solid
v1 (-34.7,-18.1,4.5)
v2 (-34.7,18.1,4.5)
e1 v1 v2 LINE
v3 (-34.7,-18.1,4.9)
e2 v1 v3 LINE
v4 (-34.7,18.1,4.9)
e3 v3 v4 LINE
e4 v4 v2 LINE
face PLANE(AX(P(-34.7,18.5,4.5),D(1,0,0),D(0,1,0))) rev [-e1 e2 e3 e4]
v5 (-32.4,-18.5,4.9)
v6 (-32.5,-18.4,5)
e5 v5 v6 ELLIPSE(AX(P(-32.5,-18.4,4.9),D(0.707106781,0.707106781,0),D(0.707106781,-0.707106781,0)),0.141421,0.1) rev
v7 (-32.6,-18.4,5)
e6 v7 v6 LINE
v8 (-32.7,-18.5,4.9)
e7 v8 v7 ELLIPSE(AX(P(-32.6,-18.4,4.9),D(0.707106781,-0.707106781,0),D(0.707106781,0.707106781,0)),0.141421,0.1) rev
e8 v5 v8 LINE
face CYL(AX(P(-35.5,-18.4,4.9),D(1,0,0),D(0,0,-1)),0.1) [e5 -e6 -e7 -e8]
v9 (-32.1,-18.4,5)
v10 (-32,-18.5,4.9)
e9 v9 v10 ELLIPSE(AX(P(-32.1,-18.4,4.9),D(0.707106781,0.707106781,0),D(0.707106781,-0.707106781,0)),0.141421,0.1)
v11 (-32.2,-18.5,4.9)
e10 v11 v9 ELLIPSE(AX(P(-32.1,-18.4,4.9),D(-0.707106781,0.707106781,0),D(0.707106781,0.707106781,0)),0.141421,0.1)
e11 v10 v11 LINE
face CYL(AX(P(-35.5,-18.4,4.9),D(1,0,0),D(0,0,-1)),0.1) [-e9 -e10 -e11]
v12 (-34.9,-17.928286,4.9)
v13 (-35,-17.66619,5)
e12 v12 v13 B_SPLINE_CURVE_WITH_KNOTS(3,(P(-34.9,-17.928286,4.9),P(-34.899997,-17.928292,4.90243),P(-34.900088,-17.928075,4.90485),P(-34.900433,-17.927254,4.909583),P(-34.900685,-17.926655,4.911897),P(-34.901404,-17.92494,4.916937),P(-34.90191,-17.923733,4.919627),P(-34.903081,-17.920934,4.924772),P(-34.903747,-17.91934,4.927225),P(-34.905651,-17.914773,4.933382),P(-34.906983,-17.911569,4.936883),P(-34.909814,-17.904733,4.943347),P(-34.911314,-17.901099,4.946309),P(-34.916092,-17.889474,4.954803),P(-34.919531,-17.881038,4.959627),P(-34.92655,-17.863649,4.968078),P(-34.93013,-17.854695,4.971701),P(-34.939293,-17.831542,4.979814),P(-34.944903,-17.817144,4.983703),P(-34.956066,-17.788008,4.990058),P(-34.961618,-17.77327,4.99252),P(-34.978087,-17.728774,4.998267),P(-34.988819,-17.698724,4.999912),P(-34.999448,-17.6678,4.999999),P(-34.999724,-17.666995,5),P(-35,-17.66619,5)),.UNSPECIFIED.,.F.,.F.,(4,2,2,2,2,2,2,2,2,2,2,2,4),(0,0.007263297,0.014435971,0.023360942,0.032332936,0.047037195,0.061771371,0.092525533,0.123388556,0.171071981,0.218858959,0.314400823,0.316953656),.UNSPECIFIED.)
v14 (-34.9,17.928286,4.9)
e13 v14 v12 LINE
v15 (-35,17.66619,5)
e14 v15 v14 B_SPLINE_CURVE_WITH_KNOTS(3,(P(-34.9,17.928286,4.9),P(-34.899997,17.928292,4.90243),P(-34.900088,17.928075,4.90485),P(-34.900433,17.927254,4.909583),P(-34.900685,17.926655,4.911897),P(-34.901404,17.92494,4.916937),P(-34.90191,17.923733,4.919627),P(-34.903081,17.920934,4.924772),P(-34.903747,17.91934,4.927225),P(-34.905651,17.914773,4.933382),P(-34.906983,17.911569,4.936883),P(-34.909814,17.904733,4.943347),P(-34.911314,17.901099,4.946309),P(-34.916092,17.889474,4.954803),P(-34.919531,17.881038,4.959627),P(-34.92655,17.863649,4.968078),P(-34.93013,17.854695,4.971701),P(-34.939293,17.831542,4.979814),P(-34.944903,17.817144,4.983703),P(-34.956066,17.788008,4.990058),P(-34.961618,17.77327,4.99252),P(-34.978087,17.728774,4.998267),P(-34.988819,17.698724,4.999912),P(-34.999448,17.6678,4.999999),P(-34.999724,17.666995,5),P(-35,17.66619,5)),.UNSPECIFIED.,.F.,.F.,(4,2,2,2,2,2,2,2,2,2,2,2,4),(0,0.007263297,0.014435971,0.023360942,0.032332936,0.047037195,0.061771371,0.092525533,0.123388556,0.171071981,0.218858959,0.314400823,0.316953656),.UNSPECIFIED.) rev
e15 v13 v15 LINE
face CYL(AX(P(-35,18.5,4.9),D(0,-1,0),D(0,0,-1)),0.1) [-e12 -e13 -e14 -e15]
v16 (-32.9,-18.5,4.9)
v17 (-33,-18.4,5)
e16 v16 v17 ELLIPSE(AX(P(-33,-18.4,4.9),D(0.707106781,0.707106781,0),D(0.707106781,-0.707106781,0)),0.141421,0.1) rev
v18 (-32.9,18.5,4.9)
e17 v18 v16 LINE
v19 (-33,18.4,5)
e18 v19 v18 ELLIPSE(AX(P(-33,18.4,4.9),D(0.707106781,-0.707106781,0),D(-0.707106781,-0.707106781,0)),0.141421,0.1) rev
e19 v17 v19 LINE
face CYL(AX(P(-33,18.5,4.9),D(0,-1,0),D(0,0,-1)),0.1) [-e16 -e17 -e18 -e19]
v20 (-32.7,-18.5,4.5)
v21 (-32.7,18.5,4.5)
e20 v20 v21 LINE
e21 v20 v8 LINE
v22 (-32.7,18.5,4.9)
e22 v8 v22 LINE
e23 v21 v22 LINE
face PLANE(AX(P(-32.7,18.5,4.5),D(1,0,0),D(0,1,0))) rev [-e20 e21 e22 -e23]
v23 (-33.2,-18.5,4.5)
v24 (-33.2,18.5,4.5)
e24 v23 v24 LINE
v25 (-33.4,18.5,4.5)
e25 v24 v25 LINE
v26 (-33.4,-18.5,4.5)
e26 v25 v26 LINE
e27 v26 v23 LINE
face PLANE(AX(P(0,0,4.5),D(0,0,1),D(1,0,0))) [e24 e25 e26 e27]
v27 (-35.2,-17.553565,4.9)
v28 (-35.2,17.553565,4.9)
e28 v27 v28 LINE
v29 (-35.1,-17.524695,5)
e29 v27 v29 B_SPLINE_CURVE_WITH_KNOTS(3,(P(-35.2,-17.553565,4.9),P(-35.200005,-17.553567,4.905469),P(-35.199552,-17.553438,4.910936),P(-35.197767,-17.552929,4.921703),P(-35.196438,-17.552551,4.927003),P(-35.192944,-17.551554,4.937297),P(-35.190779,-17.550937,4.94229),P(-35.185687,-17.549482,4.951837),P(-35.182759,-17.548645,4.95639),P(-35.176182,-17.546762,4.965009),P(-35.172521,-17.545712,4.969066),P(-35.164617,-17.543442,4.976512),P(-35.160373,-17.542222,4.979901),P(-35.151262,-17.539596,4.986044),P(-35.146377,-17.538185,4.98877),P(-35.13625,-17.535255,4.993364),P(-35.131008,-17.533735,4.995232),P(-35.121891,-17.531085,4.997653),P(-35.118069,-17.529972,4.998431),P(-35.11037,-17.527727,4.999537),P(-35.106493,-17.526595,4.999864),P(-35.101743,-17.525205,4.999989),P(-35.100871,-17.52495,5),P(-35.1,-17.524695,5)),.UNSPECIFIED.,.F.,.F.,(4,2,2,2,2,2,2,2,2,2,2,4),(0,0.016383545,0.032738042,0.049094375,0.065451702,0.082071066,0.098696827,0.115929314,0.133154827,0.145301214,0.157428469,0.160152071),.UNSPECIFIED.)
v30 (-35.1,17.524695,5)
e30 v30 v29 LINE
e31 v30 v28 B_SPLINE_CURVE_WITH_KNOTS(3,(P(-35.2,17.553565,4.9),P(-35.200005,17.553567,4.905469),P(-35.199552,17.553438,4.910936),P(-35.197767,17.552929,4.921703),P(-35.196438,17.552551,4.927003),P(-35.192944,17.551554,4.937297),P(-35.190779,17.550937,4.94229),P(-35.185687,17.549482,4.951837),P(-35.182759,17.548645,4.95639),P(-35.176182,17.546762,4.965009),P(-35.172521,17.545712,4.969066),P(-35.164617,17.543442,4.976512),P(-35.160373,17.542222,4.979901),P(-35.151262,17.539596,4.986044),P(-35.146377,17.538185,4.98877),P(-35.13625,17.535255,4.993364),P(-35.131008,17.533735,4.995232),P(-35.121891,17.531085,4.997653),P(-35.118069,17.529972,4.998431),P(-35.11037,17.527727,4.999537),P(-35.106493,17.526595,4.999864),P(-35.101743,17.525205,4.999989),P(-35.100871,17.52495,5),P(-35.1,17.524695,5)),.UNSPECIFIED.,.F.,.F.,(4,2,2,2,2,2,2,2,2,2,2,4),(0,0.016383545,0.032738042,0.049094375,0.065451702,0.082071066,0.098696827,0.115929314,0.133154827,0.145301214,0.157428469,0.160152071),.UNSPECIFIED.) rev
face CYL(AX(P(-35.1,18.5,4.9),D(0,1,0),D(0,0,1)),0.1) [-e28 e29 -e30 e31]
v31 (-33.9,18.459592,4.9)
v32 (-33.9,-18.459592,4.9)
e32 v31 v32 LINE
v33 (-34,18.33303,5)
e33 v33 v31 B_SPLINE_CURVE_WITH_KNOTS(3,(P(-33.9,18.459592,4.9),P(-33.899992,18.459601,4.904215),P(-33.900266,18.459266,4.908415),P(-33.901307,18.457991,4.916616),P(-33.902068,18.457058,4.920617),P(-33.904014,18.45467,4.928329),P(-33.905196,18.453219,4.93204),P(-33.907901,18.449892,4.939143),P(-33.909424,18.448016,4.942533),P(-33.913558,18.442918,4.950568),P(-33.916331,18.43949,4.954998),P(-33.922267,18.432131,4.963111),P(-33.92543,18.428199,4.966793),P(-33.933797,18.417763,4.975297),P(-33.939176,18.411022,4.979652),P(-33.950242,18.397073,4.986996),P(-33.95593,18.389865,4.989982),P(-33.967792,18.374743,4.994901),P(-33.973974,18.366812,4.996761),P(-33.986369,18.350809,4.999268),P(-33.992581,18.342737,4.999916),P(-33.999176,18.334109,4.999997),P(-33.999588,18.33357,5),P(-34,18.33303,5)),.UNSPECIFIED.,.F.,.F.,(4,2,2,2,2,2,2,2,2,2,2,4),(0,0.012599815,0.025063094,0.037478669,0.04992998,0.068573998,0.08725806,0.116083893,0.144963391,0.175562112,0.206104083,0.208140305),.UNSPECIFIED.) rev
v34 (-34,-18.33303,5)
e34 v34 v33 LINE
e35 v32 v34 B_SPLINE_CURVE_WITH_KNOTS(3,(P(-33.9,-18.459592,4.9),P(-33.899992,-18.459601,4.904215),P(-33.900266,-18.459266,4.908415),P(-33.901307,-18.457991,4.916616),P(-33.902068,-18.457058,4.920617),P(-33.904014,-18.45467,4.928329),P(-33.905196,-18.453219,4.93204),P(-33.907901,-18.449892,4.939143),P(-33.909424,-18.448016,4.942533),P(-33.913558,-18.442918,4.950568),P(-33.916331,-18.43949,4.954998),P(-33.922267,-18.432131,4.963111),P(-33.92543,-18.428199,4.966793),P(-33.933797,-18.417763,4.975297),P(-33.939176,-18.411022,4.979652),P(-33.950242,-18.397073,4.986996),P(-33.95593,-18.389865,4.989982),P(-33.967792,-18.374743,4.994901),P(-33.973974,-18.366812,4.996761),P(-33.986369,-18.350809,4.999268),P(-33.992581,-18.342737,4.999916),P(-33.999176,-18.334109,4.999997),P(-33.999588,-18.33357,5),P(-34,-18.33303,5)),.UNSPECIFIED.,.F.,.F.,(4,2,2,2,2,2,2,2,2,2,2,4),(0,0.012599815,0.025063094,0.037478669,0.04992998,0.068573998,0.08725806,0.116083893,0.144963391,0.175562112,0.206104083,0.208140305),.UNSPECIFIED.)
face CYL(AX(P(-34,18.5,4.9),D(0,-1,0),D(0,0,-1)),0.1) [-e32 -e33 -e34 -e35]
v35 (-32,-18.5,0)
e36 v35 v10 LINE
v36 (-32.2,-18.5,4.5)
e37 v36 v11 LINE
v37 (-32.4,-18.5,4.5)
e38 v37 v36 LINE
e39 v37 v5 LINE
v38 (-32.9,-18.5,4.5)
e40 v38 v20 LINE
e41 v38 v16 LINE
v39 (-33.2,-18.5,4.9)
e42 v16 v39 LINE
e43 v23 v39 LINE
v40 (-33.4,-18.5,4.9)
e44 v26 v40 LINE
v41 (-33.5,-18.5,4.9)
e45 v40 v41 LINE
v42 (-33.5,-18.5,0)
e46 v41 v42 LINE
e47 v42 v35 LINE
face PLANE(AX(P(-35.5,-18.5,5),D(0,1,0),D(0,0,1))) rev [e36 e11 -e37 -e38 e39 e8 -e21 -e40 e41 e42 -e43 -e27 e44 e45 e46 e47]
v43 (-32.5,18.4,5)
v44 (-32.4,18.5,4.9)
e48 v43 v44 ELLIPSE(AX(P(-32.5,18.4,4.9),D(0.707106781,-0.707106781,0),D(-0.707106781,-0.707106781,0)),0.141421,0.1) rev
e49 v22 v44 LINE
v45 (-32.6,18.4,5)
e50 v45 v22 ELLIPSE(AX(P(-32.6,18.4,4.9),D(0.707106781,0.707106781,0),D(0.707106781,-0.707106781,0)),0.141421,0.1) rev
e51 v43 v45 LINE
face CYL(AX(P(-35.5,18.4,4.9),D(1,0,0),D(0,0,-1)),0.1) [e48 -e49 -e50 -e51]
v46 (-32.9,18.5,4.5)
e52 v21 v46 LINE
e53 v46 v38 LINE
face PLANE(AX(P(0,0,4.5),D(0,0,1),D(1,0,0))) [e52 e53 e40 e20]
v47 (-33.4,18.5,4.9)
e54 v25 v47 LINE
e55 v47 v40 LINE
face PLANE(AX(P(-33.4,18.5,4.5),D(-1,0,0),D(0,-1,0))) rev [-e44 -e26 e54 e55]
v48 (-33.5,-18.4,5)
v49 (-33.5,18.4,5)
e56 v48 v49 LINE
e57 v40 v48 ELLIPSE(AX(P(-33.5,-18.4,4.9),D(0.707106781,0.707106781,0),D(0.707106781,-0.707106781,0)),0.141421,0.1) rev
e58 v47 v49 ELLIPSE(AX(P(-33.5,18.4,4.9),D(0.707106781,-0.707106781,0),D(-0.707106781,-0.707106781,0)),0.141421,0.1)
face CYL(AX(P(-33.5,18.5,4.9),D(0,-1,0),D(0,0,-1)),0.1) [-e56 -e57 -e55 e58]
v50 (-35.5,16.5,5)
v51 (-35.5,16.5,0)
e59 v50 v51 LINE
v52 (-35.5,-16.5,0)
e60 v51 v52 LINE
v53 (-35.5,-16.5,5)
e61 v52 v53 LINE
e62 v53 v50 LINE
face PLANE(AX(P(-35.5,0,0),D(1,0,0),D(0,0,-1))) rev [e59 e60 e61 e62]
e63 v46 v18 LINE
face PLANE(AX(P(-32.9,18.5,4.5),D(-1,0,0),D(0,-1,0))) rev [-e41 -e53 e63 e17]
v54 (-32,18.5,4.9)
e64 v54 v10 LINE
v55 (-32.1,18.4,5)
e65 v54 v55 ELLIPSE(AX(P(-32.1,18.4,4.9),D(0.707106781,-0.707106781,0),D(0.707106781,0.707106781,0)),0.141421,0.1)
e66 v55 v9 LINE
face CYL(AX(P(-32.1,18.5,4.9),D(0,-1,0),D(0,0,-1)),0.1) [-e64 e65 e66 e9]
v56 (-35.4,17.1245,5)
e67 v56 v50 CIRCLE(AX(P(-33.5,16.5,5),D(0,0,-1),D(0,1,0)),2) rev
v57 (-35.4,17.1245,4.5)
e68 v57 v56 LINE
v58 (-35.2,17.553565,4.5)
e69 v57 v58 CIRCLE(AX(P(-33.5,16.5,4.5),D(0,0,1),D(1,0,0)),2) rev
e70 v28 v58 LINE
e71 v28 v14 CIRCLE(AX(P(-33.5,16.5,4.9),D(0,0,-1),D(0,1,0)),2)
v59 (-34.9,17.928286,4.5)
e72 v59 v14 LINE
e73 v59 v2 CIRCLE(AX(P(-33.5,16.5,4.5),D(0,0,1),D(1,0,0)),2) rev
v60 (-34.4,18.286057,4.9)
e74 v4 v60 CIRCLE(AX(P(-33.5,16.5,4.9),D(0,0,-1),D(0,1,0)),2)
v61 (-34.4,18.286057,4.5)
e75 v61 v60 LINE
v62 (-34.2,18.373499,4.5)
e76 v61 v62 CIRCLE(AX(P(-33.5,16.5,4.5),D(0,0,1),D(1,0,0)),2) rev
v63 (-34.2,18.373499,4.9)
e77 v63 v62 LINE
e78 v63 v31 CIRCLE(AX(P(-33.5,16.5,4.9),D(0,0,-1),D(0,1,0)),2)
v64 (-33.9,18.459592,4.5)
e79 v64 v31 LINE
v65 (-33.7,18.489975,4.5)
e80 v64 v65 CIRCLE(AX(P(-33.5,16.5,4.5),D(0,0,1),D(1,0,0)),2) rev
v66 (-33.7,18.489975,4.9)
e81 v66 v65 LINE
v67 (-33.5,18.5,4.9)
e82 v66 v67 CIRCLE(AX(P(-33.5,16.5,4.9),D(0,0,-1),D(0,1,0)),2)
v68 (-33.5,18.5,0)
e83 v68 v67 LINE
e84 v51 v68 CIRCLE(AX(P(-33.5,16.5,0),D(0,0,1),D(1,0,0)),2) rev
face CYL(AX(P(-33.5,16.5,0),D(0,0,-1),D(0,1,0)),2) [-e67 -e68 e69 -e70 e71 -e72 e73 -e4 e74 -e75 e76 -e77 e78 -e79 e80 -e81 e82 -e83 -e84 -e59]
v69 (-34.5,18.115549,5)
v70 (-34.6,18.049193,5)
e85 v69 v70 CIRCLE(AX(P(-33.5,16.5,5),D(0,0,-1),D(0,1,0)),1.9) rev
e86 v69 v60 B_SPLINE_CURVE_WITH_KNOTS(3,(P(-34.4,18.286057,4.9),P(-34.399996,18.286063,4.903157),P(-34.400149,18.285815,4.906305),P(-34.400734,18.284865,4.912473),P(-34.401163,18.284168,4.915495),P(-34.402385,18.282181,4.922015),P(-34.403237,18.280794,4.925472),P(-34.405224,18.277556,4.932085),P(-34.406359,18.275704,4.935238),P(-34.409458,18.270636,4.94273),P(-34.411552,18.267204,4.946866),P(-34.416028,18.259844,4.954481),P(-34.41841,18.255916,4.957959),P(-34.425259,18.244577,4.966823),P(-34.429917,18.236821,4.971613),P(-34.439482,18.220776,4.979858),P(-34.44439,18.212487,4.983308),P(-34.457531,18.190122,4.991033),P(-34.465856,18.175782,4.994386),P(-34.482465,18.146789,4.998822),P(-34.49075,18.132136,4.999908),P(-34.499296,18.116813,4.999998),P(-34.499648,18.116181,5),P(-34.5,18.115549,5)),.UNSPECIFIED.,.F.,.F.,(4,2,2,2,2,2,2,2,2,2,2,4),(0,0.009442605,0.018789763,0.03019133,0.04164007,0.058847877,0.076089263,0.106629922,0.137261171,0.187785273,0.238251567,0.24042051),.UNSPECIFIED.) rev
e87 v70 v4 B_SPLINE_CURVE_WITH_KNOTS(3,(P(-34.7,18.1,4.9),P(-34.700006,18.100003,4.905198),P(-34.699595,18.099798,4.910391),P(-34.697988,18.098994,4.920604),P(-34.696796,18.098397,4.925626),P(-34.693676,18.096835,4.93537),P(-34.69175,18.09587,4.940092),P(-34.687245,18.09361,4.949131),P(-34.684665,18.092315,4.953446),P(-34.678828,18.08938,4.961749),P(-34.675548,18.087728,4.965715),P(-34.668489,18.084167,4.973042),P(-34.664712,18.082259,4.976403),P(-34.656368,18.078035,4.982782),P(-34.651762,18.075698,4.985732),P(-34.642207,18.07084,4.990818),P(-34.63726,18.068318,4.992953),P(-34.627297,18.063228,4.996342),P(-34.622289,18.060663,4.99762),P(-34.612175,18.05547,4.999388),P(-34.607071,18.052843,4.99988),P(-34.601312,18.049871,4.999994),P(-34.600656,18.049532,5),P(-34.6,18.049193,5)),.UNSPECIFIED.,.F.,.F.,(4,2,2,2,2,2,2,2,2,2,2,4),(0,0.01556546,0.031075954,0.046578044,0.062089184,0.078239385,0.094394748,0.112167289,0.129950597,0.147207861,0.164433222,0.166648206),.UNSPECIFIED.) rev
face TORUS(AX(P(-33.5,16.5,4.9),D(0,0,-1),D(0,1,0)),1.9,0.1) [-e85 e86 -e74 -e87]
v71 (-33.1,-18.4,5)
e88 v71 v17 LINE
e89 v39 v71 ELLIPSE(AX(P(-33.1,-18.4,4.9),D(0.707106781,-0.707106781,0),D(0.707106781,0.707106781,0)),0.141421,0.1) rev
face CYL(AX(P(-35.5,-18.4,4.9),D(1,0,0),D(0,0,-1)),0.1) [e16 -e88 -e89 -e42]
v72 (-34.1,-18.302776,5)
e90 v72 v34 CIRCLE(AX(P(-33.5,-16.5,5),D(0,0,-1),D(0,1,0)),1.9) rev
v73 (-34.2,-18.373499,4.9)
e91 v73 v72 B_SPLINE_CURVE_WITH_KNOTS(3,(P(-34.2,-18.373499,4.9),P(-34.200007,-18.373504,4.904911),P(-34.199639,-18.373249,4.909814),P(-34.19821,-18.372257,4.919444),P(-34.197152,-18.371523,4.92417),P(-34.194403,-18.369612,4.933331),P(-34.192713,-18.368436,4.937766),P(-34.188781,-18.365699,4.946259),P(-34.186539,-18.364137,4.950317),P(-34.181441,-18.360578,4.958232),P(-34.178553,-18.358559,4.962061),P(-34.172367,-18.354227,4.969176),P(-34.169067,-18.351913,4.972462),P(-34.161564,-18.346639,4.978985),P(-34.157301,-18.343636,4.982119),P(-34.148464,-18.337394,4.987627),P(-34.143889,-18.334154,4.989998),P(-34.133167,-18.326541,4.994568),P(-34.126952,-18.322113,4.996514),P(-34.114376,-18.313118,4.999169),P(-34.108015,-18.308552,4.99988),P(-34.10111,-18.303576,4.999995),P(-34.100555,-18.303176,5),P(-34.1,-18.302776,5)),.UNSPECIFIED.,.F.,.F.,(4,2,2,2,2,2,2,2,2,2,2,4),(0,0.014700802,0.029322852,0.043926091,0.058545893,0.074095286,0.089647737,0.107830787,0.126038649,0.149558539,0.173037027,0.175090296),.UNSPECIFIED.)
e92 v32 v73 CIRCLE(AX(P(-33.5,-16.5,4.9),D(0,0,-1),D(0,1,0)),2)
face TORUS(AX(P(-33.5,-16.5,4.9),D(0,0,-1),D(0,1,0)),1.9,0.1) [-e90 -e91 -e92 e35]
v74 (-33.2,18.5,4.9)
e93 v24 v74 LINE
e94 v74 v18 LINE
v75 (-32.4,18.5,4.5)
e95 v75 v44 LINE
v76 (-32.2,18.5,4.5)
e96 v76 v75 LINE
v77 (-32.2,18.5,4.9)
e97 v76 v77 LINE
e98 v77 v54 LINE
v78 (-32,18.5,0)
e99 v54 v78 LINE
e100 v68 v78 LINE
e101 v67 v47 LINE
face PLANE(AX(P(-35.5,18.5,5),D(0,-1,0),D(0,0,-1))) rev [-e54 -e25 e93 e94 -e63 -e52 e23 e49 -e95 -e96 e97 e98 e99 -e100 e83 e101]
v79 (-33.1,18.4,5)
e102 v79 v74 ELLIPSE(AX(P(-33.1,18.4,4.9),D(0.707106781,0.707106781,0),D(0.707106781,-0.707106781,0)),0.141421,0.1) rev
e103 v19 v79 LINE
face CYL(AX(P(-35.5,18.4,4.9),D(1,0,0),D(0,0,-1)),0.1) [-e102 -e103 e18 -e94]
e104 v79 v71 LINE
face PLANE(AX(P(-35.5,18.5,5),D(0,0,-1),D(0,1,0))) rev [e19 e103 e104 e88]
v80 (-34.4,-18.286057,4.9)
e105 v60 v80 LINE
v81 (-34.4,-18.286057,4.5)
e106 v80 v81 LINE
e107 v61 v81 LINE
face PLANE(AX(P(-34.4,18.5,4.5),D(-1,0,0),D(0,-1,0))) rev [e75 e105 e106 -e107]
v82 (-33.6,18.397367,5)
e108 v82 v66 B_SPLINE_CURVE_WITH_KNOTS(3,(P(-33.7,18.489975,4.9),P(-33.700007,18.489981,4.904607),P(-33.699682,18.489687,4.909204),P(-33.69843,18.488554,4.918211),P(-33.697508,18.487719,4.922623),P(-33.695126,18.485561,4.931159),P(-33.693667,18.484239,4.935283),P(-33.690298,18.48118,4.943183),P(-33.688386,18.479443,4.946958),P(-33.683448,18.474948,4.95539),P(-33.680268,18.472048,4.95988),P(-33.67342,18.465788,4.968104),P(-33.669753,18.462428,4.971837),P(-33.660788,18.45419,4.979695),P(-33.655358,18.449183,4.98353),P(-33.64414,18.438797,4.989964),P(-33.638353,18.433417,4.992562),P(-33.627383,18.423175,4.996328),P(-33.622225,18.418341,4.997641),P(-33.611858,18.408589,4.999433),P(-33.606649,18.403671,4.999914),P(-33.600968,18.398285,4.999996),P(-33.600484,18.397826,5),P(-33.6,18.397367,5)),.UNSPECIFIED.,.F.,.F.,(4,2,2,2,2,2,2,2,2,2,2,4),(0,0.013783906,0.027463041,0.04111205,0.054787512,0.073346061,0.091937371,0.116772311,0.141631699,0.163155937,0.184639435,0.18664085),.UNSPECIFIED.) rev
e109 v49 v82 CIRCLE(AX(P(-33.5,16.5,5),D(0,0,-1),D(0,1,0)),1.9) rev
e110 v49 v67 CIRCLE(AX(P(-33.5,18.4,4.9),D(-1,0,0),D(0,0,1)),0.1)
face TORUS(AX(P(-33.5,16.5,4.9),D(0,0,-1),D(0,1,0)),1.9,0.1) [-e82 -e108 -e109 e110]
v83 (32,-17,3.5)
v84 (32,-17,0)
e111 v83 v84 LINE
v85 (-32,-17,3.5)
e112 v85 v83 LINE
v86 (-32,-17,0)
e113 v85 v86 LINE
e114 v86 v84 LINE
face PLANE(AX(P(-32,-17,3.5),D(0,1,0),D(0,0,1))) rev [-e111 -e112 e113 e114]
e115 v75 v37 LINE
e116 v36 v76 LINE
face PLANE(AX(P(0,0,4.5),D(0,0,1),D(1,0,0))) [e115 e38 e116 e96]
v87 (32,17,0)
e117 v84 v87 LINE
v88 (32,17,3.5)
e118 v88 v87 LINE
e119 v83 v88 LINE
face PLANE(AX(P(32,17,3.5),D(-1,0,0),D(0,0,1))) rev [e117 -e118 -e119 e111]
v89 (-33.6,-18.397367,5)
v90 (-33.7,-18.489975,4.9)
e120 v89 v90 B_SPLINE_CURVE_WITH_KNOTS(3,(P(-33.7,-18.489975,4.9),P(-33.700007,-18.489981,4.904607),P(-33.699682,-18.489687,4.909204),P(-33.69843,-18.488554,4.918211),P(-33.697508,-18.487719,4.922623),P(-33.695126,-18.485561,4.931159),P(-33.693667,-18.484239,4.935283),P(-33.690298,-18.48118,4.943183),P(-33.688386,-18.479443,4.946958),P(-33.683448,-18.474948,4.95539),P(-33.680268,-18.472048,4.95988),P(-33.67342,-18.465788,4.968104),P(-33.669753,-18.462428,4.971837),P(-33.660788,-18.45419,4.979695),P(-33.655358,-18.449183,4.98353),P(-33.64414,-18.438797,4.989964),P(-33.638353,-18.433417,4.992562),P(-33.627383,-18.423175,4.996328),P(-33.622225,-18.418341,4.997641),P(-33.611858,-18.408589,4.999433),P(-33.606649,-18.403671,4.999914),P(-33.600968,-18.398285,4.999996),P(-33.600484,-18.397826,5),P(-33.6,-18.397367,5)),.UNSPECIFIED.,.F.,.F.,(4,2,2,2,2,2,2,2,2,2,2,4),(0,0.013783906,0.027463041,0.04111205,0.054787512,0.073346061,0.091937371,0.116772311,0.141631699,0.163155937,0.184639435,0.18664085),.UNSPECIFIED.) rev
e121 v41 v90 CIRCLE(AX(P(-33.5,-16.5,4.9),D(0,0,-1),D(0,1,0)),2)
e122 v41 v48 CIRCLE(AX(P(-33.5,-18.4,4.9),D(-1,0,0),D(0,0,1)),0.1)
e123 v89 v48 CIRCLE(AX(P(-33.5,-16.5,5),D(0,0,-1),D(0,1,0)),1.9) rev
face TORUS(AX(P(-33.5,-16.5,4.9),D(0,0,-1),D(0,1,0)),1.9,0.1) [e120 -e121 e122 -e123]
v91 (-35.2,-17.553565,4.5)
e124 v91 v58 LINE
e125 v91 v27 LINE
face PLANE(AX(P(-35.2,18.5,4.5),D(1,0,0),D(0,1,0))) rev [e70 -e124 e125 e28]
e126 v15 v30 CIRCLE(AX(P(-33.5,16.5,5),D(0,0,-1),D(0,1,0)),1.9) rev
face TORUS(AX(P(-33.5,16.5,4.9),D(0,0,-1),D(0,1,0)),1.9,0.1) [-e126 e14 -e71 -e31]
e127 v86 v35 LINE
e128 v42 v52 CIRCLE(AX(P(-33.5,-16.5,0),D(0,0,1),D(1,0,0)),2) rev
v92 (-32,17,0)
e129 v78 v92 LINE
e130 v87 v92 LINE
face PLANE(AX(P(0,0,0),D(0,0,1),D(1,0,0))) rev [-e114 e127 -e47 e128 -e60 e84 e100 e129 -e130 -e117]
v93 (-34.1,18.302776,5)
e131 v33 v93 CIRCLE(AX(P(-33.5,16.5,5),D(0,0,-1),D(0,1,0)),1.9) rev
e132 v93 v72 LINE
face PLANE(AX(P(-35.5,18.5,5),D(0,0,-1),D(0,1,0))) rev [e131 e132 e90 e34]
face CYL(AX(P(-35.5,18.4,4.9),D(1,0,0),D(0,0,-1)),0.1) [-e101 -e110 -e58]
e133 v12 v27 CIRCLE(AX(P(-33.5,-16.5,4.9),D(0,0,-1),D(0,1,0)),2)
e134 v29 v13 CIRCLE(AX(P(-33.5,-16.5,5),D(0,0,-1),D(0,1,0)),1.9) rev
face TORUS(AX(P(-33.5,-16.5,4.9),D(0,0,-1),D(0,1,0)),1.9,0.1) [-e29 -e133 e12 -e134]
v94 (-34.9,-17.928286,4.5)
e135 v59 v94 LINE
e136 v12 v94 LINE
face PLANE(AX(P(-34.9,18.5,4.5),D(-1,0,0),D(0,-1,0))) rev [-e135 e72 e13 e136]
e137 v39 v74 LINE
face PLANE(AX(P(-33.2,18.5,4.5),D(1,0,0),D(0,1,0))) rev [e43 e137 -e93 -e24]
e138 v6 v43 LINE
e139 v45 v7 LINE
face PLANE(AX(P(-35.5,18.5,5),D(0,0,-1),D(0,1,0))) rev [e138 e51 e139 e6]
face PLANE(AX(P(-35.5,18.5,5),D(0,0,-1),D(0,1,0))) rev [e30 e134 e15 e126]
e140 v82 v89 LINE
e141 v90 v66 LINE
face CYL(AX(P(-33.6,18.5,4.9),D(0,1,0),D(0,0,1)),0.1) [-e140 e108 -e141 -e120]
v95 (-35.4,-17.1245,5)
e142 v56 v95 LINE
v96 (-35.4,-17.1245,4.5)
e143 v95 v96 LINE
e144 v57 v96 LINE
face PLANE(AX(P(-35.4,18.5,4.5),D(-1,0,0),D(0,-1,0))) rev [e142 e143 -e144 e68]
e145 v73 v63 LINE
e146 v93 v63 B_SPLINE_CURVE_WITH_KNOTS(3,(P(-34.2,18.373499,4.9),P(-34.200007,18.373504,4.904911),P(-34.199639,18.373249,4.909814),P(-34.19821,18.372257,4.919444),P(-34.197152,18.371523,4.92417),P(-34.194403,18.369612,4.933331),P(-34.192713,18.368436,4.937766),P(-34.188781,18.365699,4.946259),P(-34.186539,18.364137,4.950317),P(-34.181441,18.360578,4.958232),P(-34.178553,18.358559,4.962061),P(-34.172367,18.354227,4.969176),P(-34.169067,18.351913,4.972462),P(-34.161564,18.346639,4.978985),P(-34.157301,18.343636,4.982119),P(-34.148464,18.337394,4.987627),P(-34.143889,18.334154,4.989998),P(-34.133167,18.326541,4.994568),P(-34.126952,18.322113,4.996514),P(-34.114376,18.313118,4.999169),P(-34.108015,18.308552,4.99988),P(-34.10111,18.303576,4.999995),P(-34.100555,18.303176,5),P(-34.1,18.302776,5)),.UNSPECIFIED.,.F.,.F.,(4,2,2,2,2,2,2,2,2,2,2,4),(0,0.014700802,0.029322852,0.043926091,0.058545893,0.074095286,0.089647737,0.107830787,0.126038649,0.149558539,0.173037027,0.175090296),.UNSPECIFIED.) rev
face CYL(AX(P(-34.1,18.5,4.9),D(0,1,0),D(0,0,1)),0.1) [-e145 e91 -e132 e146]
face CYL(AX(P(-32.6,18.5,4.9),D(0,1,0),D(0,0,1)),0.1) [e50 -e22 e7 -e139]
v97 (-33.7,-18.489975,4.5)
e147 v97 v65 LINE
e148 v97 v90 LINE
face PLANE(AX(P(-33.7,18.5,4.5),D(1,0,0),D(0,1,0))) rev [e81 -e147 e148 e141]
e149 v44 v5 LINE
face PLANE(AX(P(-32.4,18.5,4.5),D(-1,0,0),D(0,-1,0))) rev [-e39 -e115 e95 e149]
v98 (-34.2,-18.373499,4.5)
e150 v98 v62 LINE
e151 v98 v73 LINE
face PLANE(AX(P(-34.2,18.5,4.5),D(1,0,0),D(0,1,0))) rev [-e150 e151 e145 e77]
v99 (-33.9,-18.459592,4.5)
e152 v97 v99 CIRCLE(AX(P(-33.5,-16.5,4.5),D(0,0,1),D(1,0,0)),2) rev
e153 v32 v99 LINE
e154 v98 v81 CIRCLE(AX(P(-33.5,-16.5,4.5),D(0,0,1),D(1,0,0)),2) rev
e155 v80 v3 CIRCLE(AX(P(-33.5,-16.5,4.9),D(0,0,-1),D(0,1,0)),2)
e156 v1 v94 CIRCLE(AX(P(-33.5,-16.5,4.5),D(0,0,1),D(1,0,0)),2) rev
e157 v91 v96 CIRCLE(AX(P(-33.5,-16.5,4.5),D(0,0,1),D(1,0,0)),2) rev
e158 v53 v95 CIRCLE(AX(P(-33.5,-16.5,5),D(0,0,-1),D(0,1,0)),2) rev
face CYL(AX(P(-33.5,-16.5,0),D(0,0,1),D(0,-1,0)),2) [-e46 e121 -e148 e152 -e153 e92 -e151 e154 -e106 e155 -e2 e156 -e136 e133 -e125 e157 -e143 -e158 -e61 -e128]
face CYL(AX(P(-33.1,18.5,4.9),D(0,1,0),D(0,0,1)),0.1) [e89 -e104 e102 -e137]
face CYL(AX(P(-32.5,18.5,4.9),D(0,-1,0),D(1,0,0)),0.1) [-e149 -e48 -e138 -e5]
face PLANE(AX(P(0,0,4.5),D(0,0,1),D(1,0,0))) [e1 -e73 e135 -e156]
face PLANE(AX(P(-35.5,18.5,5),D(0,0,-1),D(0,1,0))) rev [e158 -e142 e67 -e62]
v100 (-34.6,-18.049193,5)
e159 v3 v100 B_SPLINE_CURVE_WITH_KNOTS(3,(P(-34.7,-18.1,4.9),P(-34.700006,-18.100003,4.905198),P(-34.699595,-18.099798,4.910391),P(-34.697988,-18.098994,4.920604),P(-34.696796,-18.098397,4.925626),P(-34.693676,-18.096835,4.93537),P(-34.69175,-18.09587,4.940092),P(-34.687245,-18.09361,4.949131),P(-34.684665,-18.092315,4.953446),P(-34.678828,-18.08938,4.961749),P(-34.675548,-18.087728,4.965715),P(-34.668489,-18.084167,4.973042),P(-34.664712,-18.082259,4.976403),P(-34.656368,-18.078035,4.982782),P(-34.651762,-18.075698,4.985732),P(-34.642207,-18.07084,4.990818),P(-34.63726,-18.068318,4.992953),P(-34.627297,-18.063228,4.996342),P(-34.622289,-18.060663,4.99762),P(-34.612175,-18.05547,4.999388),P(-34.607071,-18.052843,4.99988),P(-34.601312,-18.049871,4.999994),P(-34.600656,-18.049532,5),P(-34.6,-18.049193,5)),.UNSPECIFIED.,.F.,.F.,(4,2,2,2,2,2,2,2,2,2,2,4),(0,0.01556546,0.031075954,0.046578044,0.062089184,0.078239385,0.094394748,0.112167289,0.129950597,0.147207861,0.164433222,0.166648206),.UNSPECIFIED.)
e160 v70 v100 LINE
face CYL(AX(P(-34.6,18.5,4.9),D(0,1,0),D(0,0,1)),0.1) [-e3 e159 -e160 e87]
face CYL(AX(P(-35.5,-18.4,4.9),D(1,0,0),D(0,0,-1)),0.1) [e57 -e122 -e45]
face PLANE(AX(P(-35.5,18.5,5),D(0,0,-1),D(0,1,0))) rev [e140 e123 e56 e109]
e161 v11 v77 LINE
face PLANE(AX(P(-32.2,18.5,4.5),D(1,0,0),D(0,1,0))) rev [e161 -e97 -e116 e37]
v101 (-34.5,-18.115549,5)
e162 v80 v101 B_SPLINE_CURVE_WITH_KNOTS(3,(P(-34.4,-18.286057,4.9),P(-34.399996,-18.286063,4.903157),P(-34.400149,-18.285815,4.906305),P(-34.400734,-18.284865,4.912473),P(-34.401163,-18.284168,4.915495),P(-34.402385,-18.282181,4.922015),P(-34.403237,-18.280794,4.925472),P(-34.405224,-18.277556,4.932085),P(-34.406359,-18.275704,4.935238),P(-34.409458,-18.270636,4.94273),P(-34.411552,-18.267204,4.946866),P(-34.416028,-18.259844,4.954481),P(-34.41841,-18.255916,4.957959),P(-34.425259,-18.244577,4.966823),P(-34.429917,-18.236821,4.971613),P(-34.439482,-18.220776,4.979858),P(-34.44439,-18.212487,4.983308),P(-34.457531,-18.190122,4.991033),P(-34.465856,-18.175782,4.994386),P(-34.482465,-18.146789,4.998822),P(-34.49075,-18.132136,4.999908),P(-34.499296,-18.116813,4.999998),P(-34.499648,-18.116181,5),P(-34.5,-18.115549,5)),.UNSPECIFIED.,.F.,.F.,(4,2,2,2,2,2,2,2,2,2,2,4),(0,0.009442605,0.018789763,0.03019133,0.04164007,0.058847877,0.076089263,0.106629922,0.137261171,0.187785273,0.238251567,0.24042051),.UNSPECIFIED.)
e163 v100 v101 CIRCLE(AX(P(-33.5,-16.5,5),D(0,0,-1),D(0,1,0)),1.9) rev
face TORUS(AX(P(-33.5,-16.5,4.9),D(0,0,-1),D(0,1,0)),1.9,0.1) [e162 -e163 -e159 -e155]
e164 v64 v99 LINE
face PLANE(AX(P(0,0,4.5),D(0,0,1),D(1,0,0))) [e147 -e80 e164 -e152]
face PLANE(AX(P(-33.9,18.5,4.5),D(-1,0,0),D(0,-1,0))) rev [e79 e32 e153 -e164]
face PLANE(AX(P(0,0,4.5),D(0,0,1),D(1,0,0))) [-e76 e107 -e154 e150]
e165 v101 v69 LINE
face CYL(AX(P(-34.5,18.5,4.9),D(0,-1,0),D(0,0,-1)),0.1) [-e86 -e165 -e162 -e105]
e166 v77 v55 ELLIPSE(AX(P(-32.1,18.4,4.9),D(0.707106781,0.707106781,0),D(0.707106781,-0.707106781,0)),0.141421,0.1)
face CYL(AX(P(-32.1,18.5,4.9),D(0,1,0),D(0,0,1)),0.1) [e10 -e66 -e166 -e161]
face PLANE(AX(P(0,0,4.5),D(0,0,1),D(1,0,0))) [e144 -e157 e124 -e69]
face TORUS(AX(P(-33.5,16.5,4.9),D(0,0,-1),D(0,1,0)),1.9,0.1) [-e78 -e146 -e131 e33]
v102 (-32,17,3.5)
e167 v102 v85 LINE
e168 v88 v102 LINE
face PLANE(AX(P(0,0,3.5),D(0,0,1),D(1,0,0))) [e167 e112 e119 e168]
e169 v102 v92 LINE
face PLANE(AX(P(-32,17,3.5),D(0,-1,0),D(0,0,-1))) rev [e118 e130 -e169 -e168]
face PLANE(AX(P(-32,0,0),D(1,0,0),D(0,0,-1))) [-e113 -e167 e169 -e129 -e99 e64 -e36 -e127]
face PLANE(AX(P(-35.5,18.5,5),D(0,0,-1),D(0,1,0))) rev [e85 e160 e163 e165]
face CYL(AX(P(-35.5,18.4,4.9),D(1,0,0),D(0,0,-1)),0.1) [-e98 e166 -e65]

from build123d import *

# Parameters (mm, degrees)
CROQUIS1_W              = 64
CROQUIS1_H              = 34
SALIENTE_EXTRUIR1_DEPTH = 3.5
CROQUIS3_W              = 5
CROQUIS3_H              = 37
SALIENTE_EXTRUIR2_DEPTH = 3.5
REDONDEO1_R             = 2
CROQUIS4_W              = 0.2
CROQUIS4_H              = 37
CORTAR_EXTRUIR1_DEPTH   = 0.5
REDONDEO2_R             = 0.1


with BuildPart() as part:
    # Croquis1 → Saliente-Extruir1 (new body)
    with BuildSketch(Plane.XY):
        Rectangle(CROQUIS1_W, CROQUIS1_H)
    extrude(amount=SALIENTE_EXTRUIR1_DEPTH)

    # Croquis3 → Saliente-Extruir2 (add)
    with BuildSketch(Plane.ZY.offset(32)):
        with Locations((2.5, 0)):
            Rectangle(CROQUIS3_W, CROQUIS3_H)
    extrude(amount=SALIENTE_EXTRUIR2_DEPTH)

    # Redondeo1
    redondeo1_edges = [part.edges().sort_by_distance(p)[0] for p in [
        (-35.5, 18.5, 2.5),
        (-35.5, -18.5, 2.5),
    ]]
    fillet(redondeo1_edges, radius=REDONDEO1_R)

    # Croquis4 → Cortar-Extruir1 (cut)
    with BuildSketch(Plane.XY.offset(5)):
        with Locations((-32.3, 0)):
            Rectangle(CROQUIS4_W, CROQUIS4_H)
        with Locations((-32.8, 0)):
            Rectangle(CROQUIS4_W, CROQUIS4_H)
        with Locations((-33.3, 0)):
            Rectangle(CROQUIS4_W, CROQUIS4_H)
        with Locations((-33.8, 0)):
            Rectangle(CROQUIS4_W, CROQUIS4_H)
        with Locations((-34.3, 0)):
            Rectangle(CROQUIS4_W, CROQUIS4_H)
        with Locations((-34.8, 0)):
            Rectangle(CROQUIS4_W, CROQUIS4_H)
        with Locations((-35.3, 0)):
            Rectangle(CROQUIS4_W, CROQUIS4_H)
    extrude(amount=-CORTAR_EXTRUIR1_DEPTH, mode=Mode.SUBTRACT)

    # Redondeo2
    redondeo2_edges = [part.edges().sort_by_distance(p)[0] for p in [
        (-32.9, 0, 5),
        (-32.7, 0, 5),
        (-33.4, 0, 5),
        (-33.2, 0, 5),
        (-33.7, 0, 5),
        (-33.9, 0, 5),
        (-34.2, 0, 5),
        (-34.4, 0, 5),
        (-34.7, 0, 5),
        (-34.9, 0, 5),
        (-35.2, 0, 5),
        (-32, 0, 5),
        (-33.45, 18.5, 5),
        (-33.45, -18.5, 5),
        (-33.60012555, 18.497492146, 5),
        (-34.051681951, 18.422406571, 5),
        (-34.554113045, 18.199660463, 5),
        (-35.061282751, 17.749958468, 5),
        (-35.061282751, -17.749958468, 5),
        (-34.554113045, -18.199660463, 5),
        (-34.051681951, -18.422406571, 5),
        (-33.60012555, -18.497492146, 5),
        (-33.05, -18.5, 5),
        (-32.55, -18.5, 5),
        (-32.1, -18.5, 5),
        (-33.05, 18.5, 5),
        (-32.55, 18.5, 5),
        (-32.1, 18.5, 5),
        (-32.4, 0, 5),
        (-32.2, 0, 5),
    ]]
    fillet(redondeo2_edges, radius=REDONDEO2_R - 0.0001)  # a hair under: the kernel refuses the full size


solid = part.part
